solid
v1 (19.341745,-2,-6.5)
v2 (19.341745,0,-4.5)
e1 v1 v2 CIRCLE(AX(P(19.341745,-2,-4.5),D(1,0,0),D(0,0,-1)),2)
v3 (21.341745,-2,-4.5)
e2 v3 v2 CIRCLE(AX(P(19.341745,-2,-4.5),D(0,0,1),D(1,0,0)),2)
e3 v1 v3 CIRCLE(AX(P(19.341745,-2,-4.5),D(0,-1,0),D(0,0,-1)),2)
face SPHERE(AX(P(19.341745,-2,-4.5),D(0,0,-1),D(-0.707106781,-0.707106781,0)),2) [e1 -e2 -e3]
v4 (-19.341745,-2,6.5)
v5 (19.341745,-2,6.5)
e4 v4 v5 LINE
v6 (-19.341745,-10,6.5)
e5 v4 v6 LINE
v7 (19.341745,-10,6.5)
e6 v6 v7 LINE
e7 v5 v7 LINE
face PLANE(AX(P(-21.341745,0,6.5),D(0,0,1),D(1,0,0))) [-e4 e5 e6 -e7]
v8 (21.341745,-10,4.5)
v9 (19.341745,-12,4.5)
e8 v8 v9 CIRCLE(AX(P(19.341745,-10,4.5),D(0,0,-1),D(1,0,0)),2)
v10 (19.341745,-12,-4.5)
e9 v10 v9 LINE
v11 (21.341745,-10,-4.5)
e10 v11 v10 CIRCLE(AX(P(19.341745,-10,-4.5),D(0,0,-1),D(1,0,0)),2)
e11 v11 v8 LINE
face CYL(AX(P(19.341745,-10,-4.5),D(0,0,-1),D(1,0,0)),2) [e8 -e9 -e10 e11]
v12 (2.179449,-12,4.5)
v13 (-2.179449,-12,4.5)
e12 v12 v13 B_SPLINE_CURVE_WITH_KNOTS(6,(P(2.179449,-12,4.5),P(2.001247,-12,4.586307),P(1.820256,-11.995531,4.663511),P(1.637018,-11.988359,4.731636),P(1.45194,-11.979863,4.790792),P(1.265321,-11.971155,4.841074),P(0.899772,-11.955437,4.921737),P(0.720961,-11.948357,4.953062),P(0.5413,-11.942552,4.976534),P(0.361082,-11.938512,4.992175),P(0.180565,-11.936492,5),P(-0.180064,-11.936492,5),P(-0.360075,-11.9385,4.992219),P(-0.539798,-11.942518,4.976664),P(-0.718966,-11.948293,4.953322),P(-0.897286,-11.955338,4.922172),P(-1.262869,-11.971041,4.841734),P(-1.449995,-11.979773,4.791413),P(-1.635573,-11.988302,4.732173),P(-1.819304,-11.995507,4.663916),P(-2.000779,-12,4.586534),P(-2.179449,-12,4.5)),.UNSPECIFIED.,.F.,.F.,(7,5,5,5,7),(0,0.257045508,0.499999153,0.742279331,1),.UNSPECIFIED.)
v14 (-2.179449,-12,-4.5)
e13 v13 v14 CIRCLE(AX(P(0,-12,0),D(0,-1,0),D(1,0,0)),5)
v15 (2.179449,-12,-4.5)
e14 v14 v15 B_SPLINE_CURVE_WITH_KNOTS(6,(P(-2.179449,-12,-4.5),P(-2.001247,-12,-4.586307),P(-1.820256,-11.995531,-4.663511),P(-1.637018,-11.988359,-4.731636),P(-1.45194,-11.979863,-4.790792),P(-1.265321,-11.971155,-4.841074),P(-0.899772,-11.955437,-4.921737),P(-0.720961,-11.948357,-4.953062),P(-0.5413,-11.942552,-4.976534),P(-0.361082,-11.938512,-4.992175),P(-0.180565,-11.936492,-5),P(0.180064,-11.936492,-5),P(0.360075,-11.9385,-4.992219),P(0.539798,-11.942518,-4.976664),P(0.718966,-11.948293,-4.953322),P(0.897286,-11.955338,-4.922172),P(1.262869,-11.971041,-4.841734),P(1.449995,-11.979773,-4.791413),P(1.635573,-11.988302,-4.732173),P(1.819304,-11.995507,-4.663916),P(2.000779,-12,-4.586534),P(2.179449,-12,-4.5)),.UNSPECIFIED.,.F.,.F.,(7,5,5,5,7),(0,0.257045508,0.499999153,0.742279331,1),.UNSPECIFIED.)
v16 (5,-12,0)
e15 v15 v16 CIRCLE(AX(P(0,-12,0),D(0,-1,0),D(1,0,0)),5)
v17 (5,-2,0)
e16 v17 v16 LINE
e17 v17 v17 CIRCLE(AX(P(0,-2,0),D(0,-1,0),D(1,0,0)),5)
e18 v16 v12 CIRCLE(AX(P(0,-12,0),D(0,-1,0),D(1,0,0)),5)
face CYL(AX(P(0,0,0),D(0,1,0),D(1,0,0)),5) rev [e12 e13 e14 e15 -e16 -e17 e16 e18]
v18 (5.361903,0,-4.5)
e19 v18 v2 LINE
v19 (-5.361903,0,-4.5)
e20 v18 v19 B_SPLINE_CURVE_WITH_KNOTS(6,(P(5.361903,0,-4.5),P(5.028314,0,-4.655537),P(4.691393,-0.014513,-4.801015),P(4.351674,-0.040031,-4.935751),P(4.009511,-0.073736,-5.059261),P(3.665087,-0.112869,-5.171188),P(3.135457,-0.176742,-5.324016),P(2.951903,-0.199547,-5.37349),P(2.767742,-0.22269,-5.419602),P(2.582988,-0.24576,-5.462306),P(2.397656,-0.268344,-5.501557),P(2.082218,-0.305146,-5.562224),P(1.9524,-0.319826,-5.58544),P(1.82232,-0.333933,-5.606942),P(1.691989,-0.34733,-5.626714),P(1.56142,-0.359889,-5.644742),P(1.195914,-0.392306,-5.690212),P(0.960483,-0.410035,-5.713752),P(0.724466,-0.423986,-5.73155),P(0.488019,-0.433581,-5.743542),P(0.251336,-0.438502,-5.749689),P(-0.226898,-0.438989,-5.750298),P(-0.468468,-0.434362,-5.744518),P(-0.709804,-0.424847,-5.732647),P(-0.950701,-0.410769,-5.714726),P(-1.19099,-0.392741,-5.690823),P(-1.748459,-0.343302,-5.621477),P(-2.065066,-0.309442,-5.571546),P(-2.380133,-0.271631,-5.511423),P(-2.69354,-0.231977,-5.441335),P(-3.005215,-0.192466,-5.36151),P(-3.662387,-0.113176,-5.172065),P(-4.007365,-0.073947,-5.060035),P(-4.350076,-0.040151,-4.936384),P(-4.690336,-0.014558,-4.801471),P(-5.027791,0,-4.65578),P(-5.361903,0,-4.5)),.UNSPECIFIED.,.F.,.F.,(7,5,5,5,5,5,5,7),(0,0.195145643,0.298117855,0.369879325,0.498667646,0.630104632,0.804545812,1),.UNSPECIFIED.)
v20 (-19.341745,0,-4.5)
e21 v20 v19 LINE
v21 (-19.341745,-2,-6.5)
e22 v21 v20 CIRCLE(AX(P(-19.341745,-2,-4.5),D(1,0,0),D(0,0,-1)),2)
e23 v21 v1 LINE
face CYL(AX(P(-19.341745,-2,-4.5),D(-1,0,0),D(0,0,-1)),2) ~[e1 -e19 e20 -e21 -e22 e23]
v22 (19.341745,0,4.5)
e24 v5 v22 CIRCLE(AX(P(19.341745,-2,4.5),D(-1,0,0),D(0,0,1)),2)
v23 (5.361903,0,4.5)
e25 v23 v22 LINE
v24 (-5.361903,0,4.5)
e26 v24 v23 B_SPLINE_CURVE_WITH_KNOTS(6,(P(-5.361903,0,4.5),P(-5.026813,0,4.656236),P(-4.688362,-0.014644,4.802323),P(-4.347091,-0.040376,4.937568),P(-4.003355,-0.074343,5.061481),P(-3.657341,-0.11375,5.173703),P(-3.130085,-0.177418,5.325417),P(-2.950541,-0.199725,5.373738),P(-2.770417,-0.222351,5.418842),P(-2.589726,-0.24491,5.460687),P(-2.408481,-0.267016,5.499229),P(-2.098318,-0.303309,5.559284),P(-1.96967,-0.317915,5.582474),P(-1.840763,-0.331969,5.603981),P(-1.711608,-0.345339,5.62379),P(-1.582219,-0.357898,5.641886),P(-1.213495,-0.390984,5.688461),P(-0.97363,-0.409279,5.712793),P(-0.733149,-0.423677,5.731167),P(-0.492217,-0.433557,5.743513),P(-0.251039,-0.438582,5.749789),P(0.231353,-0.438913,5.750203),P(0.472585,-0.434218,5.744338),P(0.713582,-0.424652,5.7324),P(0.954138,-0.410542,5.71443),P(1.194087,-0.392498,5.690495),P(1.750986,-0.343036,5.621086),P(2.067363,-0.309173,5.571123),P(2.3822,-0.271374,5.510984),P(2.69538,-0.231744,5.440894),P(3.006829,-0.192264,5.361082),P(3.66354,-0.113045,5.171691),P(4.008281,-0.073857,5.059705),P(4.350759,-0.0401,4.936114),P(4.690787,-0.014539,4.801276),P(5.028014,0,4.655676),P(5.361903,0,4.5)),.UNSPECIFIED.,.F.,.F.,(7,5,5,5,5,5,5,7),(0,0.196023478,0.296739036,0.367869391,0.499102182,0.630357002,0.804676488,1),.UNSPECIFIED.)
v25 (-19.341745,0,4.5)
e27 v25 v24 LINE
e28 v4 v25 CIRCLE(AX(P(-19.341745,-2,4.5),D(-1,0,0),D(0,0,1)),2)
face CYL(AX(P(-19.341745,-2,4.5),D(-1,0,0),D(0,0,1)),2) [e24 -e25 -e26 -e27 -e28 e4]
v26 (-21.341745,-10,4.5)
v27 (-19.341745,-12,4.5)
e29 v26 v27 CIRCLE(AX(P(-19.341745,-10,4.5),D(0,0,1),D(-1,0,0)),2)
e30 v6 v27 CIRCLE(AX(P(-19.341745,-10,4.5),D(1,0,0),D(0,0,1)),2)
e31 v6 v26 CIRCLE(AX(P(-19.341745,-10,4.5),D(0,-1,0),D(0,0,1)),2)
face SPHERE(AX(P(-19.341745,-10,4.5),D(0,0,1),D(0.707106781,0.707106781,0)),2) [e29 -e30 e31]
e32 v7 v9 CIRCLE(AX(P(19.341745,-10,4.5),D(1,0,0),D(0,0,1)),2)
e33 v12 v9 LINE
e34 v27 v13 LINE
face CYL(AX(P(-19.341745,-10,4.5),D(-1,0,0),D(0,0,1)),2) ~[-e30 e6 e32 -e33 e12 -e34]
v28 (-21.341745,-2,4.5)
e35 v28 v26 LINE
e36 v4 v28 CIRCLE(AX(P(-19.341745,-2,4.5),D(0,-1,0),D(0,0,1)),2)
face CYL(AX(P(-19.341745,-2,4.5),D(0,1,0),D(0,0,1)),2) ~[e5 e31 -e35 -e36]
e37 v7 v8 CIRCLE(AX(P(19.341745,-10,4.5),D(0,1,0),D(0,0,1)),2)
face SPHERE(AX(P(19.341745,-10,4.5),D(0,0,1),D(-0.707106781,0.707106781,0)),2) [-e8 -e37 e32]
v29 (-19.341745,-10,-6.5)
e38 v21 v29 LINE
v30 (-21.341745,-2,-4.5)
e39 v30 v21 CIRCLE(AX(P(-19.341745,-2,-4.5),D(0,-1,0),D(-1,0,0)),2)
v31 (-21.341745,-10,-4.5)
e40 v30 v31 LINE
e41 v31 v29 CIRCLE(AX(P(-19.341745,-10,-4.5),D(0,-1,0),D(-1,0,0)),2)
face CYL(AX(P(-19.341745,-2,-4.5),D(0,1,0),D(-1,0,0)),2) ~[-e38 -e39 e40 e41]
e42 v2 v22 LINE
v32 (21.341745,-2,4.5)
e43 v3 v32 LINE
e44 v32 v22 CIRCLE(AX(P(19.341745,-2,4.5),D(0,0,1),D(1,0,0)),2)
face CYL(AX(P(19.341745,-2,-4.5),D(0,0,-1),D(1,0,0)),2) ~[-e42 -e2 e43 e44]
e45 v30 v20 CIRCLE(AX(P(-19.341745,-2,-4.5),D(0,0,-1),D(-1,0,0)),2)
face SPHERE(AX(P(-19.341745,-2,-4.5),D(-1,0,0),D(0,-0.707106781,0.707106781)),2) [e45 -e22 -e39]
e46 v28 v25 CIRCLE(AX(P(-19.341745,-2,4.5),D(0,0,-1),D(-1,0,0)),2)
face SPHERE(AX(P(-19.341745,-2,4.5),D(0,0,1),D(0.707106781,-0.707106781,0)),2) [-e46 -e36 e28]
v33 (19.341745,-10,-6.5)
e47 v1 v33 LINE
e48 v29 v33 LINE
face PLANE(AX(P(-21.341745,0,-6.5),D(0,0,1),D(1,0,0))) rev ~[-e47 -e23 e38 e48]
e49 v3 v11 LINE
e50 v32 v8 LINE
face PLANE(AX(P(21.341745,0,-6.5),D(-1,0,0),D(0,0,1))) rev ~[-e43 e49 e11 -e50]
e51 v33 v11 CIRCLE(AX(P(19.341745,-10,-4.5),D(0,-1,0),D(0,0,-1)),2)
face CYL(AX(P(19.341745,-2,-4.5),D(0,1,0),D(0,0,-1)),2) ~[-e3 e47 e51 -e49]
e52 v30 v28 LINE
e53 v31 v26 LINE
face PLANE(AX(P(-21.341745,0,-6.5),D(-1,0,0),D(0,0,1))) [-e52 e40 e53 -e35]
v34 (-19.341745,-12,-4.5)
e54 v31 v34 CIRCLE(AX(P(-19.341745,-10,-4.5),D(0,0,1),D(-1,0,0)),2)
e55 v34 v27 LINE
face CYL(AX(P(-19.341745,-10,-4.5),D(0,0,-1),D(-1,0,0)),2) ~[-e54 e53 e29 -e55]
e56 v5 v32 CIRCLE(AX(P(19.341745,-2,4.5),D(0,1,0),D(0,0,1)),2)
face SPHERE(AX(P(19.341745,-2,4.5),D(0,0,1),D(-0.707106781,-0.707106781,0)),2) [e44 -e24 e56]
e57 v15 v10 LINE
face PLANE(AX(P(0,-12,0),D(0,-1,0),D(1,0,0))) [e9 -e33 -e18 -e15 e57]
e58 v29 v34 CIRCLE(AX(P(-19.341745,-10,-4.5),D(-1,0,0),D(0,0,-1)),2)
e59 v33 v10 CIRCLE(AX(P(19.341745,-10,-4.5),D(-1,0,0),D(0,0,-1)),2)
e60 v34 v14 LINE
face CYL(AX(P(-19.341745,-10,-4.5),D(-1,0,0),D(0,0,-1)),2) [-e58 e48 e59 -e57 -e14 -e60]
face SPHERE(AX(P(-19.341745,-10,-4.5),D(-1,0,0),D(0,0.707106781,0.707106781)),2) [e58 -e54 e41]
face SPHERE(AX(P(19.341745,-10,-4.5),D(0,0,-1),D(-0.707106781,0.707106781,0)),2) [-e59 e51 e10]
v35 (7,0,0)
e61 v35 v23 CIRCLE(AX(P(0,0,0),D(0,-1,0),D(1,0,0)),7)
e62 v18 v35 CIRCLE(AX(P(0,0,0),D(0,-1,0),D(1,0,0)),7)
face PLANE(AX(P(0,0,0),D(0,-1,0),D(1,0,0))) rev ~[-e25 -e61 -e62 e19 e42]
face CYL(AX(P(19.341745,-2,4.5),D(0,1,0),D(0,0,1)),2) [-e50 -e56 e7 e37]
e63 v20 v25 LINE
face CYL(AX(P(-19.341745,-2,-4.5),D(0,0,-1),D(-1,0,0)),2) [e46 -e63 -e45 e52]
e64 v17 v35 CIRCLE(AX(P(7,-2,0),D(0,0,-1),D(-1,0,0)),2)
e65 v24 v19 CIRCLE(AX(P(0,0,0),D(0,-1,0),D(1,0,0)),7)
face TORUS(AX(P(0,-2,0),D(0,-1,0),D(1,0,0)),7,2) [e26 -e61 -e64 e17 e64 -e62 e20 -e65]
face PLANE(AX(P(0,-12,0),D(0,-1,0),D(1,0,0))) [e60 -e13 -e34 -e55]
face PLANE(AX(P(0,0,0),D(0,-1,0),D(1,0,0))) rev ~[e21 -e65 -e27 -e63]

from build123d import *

# Parameters (mm, degrees)
F0_W         = 42.6834902611
F0_H         = 13
F0_R         = 5
F1_DEPTH     = 12
F2_T1_DEPTH  = 8
F2_T3_DEPTH  = 9
F2_T5_DEPTH  = 38.6834902611
F2_S9_W      = 2
F2_S9_H      = 2
F2_T10_DEPTH = 2
F2_S15_W     = 2
F2_S15_H     = 2
F2_T16_DEPTH = 2
F2_S21_W     = 2
F2_S21_H     = 2
F2_T22_DEPTH = 2
F2_S27_W     = 2
F2_S27_H     = 2
F2_T28_DEPTH = 2
F2_S33_W     = 2
F2_S33_H     = 2
F2_T34_DEPTH = 2
F2_S39_W     = 2
F2_S39_H     = 2
F2_T40_DEPTH = 2
F2_S45_W     = 2
F2_S45_H     = 2
F2_T46_DEPTH = 2
F2_S51_W     = 2
F2_S51_H     = 2
F2_T52_DEPTH = 2


# Not quite as in the source:
# - a fillet or chamfer that OpenCascade refuses, or shapes differently, is made with other operations: its cross-section is extruded or revolved along the edge and cut away or added


with BuildPart() as f1:
    # F0 (on Front) → F1 (new body)
    with BuildSketch(Plane.XZ):
        Rectangle(F0_W, F0_H)
        Circle(F0_R, mode=Mode.SUBTRACT)
    extrude(amount=F1_DEPTH)

    # F2: fillet of radius 2 on 13 edges, made by hand

    # F2_s2 → F2_t1 (cut)
    with BuildSketch(Plane.XZ.offset(2)):
        with BuildLine():
            ThreePointArc((-19.3417451306, 6.5), (-20.7559586929, 5.9142135624), (-21.3417451306, 4.5))
            Line((-21.3417451306, 4.5), (-21.3417451306, 6.5))
            Line((-21.3417451306, 6.5), (-19.3417451306, 6.5))
        make_face()
        with BuildLine():
            ThreePointArc((19.3417451306, 6.5), (20.7559586929, 5.9142135624), (21.3417451306, 4.5))
            Line((21.3417451306, 4.5), (21.3417451306, 6.5))
            Line((21.3417451306, 6.5), (19.3417451306, 6.5))
        make_face()
        with BuildLine():
            ThreePointArc((19.3417451306, -6.5), (20.7559586929, -5.9142135624), (21.3417451306, -4.5))
            Line((21.3417451306, -4.5), (21.3417451306, -6.5))
            Line((21.3417451306, -6.5), (19.3417451306, -6.5))
        make_face()
        with BuildLine():
            ThreePointArc((-21.3417451306, -4.5), (-20.7559586929, -5.9142135624), (-19.3417451306, -6.5))
            Line((-19.3417451306, -6.5), (-21.3417451306, -6.5))
            Line((-21.3417451306, -6.5), (-21.3417451306, -4.5))
        make_face()
    extrude(amount=F2_T1_DEPTH, mode=Mode.SUBTRACT)

    # F2_s4 → F2_t3 (cut)
    with BuildSketch(Plane.XY.offset(-4.5)):
        with BuildLine():
            ThreePointArc((21.3417451306, -10), (20.7559586929, -11.4142135624), (19.3417451306, -12))
            Line((19.3417451306, -12), (21.3417451306, -12))
            Line((21.3417451306, -12), (21.3417451306, -10))
        make_face()
        with BuildLine():
            ThreePointArc((21.3417451306, -2), (20.7559586929, -0.5857864376), (19.3417451306, 0))
            Line((19.3417451306, 0), (21.3417451306, 0))
            Line((21.3417451306, 0), (21.3417451306, -2))
        make_face()
        with BuildLine():
            ThreePointArc((-21.3417451306, -10), (-20.7559586929, -11.4142135624), (-19.3417451306, -12))
            Line((-19.3417451306, -12), (-21.3417451306, -12))
            Line((-21.3417451306, -12), (-21.3417451306, -10))
        make_face()
        with BuildLine():
            ThreePointArc((-21.3417451306, -2), (-20.7559586929, -0.5857864376), (-19.3417451306, 0))
            Line((-19.3417451306, 0), (-21.3417451306, 0))
            Line((-21.3417451306, 0), (-21.3417451306, -2))
        make_face()
    extrude(amount=F2_T3_DEPTH, mode=Mode.SUBTRACT)

    # F2_s6 → F2_t5 (cut)
    with BuildSketch(Plane.YZ.offset(-19.3417451306)):
        with BuildLine():
            ThreePointArc((-2, 6.5), (-0.5857864376, 5.9142135624), (0, 4.5))
            Line((0, 4.5), (0, 6.5))
            Line((0, 6.5), (-2, 6.5))
        make_face()
        with BuildLine():
            ThreePointArc((-10, 6.5), (-11.4142135624, 5.9142135624), (-12, 4.5))
            Line((-12, 4.5), (-12, 6.5))
            Line((-12, 6.5), (-10, 6.5))
        make_face()
        with BuildLine():
            ThreePointArc((-2, -6.5), (-0.5857864376, -5.9142135624), (0, -4.5))
            Line((0, -4.5), (0, -6.5))
            Line((0, -6.5), (-2, -6.5))
        make_face()
        with BuildLine():
            ThreePointArc((-10, -6.5), (-11.4142135624, -5.9142135624), (-12, -4.5))
            Line((-12, -4.5), (-12, -6.5))
            Line((-12, -6.5), (-10, -6.5))
        make_face()
    extrude(amount=F2_T5_DEPTH, mode=Mode.SUBTRACT)


with BuildPart() as f2_tool8:
    # F2_s9 → F2_t10 (new body)
    with BuildSketch(Plane.XY.offset(4.5)):
        with Locations((-20.3417451306, -1)):
            Rectangle(F2_S9_W, F2_S9_H)
    extrude(amount=F2_T10_DEPTH)

    # F2_s11 → F2_t12 (revolve, cut)
    with BuildSketch(Plane(origin=(-19.3417451306, -2, 4.5), x_dir=(0.7071067812, -0.7071067812, 0), z_dir=(-0.7071067812, -0.7071067812, 0))):
        with BuildLine():
            ThreePointArc((0, -2), (2, 0), (0, 2))
            Line((0, 2), (0, -2))
        make_face()
    revolve(axis=Axis((-19.3417451306, -2, 4.5), (0, 0, 1)), mode=Mode.SUBTRACT)


with BuildPart() as f1_1:
    add(f1.part)

    # F2_t7: cut F2_tool8
    add(f2_tool8.part, mode=Mode.SUBTRACT)


with BuildPart() as f2_tool14:
    # F2_s15 → F2_t16 (new body)
    with BuildSketch(Plane.XY.offset(4.5)):
        with Locations((-20.3417451306, -11)):
            Rectangle(F2_S15_W, F2_S15_H)
    extrude(amount=F2_T16_DEPTH)

    # F2_s17 → F2_t18 (revolve, cut)
    with BuildSketch(Plane(origin=(-19.3417451306, -10, 4.5), x_dir=(0.7071067812, 0.7071067812, 0), z_dir=(0.7071067812, -0.7071067812, 0))):
        with BuildLine():
            ThreePointArc((0, -2), (2, 0), (0, 2))
            Line((0, 2), (0, -2))
        make_face()
    revolve(axis=Axis((-19.3417451306, -10, 4.5), (0, 0, 1)), mode=Mode.SUBTRACT)


with BuildPart() as f1_2:
    add(f1_1.part)

    # F2_t13: cut F2_tool14
    add(f2_tool14.part, mode=Mode.SUBTRACT)


with BuildPart() as f2_tool20:
    # F2_s21 → F2_t22 (new body)
    with BuildSketch(Plane.XY.offset(4.5)):
        with Locations((20.3417451306, -1)):
            Rectangle(F2_S21_W, F2_S21_H)
    extrude(amount=F2_T22_DEPTH)

    # F2_s23 → F2_t24 (revolve, cut)
    with BuildSketch(Plane(origin=(19.3417451306, -2, 4.5), x_dir=(-0.7071067812, -0.7071067812, 0), z_dir=(-0.7071067812, 0.7071067812, 0))):
        with BuildLine():
            ThreePointArc((0, -2), (2, 0), (0, 2))
            Line((0, 2), (0, -2))
        make_face()
    revolve(axis=Axis((19.3417451306, -2, 4.5), (0, 0, 1)), mode=Mode.SUBTRACT)


with BuildPart() as f1_3:
    add(f1_2.part)

    # F2_t19: cut F2_tool20
    add(f2_tool20.part, mode=Mode.SUBTRACT)


with BuildPart() as f2_tool26:
    # F2_s27 → F2_t28 (new body)
    with BuildSketch(Plane.XY.offset(4.5)):
        with Locations((20.3417451306, -11)):
            Rectangle(F2_S27_W, F2_S27_H)
    extrude(amount=F2_T28_DEPTH)

    # F2_s29 → F2_t30 (revolve, cut)
    with BuildSketch(Plane(origin=(19.3417451306, -10, 4.5), x_dir=(-0.7071067812, 0.7071067812, 0), z_dir=(0.7071067812, 0.7071067812, 0))):
        with BuildLine():
            ThreePointArc((0, -2), (2, 0), (0, 2))
            Line((0, 2), (0, -2))
        make_face()
    revolve(axis=Axis((19.3417451306, -10, 4.5), (0, 0, 1)), mode=Mode.SUBTRACT)


with BuildPart() as f1_4:
    add(f1_3.part)

    # F2_t25: cut F2_tool26
    add(f2_tool26.part, mode=Mode.SUBTRACT)


with BuildPart() as f2_tool32:
    # F2_s33 → F2_t34 (new body)
    with BuildSketch(Plane.XY.offset(-4.5)):
        with Locations((20.3417451306, -1)):
            Rectangle(F2_S33_W, F2_S33_H)
    extrude(amount=-F2_T34_DEPTH)

    # F2_s35 → F2_t36 (revolve, cut)
    with BuildSketch(Plane(origin=(19.3417451306, -2, -4.5), x_dir=(-0.7071067812, -0.7071067812, 0), z_dir=(0.7071067812, -0.7071067812, 0))):
        with BuildLine():
            ThreePointArc((0, -2), (2, 0), (0, 2))
            Line((0, 2), (0, -2))
        make_face()
    revolve(axis=Axis((19.3417451306, -2, -4.5), (0, 0, -1)), mode=Mode.SUBTRACT)


with BuildPart() as f1_5:
    add(f1_4.part)

    # F2_t31: cut F2_tool32
    add(f2_tool32.part, mode=Mode.SUBTRACT)


with BuildPart() as f2_tool38:
    # F2_s39 → F2_t40 (new body)
    with BuildSketch(Plane.XY.offset(-4.5)):
        with Locations((20.3417451306, -11)):
            Rectangle(F2_S39_W, F2_S39_H)
    extrude(amount=-F2_T40_DEPTH)

    # F2_s41 → F2_t42 (revolve, cut)
    with BuildSketch(Plane(origin=(19.3417451306, -10, -4.5), x_dir=(-0.7071067812, 0.7071067812, 0), z_dir=(-0.7071067812, -0.7071067812, 0))):
        with BuildLine():
            ThreePointArc((0, -2), (2, 0), (0, 2))
            Line((0, 2), (0, -2))
        make_face()
    revolve(axis=Axis((19.3417451306, -10, -4.5), (0, 0, -1)), mode=Mode.SUBTRACT)


with BuildPart() as f1_6:
    add(f1_5.part)

    # F2_t37: cut F2_tool38
    add(f2_tool38.part, mode=Mode.SUBTRACT)


with BuildPart() as f2_tool44:
    # F2_s45 → F2_t46 (new body)
    with BuildSketch(Plane.YZ.offset(-19.3417451306)):
        with Locations((-11, -5.5)):
            Rectangle(F2_S45_W, F2_S45_H)
    extrude(amount=-F2_T46_DEPTH)

    # F2_s47 → F2_t48 (revolve, cut)
    with BuildSketch(Plane(origin=(-19.3417451306, -10, -4.5), x_dir=(0, 0.7071067812, 0.7071067812), z_dir=(0, -0.7071067812, 0.7071067812))):
        with BuildLine():
            ThreePointArc((0, -2), (2, 0), (0, 2))
            Line((0, 2), (0, -2))
        make_face()
    revolve(axis=Axis((-19.3417451306, -10, -4.5), (-1, 0, 0)), mode=Mode.SUBTRACT)


with BuildPart() as f1_7:
    add(f1_6.part)

    # F2_t43: cut F2_tool44
    add(f2_tool44.part, mode=Mode.SUBTRACT)


with BuildPart() as f2_tool50:
    # F2_s51 → F2_t52 (new body)
    with BuildSketch(Plane.YZ.offset(-19.3417451306)):
        with Locations((-1, -5.5)):
            Rectangle(F2_S51_W, F2_S51_H)
    extrude(amount=-F2_T52_DEPTH)

    # F2_s53 → F2_t54 (revolve, cut)
    with BuildSketch(Plane(origin=(-19.3417451306, -2, -4.5), x_dir=(0, -0.7071067812, 0.7071067812), z_dir=(0, -0.7071067812, -0.7071067812))):
        with BuildLine():
            ThreePointArc((0, -2), (2, 0), (0, 2))
            Line((0, 2), (0, -2))
        make_face()
    revolve(axis=Axis((-19.3417451306, -2, -4.5), (-1, 0, 0)), mode=Mode.SUBTRACT)


with BuildPart() as f1_8:
    add(f1_7.part)

    # F2_t49: cut F2_tool50
    add(f2_tool50.part, mode=Mode.SUBTRACT)

    # F2_s55 → F2_t56 (revolve, cut)
    with BuildSketch(Plane.XY):
        with BuildLine():
            ThreePointArc((5, -2), (5.5857864376, -0.5857864376), (7, 0))
            Line((7, 0), (5, 0))
            Line((5, 0), (5, -2))
        make_face()
    revolve(axis=Axis((0, 0, 0), (0, -1, 0)), mode=Mode.SUBTRACT)


solid = f1_8.part
